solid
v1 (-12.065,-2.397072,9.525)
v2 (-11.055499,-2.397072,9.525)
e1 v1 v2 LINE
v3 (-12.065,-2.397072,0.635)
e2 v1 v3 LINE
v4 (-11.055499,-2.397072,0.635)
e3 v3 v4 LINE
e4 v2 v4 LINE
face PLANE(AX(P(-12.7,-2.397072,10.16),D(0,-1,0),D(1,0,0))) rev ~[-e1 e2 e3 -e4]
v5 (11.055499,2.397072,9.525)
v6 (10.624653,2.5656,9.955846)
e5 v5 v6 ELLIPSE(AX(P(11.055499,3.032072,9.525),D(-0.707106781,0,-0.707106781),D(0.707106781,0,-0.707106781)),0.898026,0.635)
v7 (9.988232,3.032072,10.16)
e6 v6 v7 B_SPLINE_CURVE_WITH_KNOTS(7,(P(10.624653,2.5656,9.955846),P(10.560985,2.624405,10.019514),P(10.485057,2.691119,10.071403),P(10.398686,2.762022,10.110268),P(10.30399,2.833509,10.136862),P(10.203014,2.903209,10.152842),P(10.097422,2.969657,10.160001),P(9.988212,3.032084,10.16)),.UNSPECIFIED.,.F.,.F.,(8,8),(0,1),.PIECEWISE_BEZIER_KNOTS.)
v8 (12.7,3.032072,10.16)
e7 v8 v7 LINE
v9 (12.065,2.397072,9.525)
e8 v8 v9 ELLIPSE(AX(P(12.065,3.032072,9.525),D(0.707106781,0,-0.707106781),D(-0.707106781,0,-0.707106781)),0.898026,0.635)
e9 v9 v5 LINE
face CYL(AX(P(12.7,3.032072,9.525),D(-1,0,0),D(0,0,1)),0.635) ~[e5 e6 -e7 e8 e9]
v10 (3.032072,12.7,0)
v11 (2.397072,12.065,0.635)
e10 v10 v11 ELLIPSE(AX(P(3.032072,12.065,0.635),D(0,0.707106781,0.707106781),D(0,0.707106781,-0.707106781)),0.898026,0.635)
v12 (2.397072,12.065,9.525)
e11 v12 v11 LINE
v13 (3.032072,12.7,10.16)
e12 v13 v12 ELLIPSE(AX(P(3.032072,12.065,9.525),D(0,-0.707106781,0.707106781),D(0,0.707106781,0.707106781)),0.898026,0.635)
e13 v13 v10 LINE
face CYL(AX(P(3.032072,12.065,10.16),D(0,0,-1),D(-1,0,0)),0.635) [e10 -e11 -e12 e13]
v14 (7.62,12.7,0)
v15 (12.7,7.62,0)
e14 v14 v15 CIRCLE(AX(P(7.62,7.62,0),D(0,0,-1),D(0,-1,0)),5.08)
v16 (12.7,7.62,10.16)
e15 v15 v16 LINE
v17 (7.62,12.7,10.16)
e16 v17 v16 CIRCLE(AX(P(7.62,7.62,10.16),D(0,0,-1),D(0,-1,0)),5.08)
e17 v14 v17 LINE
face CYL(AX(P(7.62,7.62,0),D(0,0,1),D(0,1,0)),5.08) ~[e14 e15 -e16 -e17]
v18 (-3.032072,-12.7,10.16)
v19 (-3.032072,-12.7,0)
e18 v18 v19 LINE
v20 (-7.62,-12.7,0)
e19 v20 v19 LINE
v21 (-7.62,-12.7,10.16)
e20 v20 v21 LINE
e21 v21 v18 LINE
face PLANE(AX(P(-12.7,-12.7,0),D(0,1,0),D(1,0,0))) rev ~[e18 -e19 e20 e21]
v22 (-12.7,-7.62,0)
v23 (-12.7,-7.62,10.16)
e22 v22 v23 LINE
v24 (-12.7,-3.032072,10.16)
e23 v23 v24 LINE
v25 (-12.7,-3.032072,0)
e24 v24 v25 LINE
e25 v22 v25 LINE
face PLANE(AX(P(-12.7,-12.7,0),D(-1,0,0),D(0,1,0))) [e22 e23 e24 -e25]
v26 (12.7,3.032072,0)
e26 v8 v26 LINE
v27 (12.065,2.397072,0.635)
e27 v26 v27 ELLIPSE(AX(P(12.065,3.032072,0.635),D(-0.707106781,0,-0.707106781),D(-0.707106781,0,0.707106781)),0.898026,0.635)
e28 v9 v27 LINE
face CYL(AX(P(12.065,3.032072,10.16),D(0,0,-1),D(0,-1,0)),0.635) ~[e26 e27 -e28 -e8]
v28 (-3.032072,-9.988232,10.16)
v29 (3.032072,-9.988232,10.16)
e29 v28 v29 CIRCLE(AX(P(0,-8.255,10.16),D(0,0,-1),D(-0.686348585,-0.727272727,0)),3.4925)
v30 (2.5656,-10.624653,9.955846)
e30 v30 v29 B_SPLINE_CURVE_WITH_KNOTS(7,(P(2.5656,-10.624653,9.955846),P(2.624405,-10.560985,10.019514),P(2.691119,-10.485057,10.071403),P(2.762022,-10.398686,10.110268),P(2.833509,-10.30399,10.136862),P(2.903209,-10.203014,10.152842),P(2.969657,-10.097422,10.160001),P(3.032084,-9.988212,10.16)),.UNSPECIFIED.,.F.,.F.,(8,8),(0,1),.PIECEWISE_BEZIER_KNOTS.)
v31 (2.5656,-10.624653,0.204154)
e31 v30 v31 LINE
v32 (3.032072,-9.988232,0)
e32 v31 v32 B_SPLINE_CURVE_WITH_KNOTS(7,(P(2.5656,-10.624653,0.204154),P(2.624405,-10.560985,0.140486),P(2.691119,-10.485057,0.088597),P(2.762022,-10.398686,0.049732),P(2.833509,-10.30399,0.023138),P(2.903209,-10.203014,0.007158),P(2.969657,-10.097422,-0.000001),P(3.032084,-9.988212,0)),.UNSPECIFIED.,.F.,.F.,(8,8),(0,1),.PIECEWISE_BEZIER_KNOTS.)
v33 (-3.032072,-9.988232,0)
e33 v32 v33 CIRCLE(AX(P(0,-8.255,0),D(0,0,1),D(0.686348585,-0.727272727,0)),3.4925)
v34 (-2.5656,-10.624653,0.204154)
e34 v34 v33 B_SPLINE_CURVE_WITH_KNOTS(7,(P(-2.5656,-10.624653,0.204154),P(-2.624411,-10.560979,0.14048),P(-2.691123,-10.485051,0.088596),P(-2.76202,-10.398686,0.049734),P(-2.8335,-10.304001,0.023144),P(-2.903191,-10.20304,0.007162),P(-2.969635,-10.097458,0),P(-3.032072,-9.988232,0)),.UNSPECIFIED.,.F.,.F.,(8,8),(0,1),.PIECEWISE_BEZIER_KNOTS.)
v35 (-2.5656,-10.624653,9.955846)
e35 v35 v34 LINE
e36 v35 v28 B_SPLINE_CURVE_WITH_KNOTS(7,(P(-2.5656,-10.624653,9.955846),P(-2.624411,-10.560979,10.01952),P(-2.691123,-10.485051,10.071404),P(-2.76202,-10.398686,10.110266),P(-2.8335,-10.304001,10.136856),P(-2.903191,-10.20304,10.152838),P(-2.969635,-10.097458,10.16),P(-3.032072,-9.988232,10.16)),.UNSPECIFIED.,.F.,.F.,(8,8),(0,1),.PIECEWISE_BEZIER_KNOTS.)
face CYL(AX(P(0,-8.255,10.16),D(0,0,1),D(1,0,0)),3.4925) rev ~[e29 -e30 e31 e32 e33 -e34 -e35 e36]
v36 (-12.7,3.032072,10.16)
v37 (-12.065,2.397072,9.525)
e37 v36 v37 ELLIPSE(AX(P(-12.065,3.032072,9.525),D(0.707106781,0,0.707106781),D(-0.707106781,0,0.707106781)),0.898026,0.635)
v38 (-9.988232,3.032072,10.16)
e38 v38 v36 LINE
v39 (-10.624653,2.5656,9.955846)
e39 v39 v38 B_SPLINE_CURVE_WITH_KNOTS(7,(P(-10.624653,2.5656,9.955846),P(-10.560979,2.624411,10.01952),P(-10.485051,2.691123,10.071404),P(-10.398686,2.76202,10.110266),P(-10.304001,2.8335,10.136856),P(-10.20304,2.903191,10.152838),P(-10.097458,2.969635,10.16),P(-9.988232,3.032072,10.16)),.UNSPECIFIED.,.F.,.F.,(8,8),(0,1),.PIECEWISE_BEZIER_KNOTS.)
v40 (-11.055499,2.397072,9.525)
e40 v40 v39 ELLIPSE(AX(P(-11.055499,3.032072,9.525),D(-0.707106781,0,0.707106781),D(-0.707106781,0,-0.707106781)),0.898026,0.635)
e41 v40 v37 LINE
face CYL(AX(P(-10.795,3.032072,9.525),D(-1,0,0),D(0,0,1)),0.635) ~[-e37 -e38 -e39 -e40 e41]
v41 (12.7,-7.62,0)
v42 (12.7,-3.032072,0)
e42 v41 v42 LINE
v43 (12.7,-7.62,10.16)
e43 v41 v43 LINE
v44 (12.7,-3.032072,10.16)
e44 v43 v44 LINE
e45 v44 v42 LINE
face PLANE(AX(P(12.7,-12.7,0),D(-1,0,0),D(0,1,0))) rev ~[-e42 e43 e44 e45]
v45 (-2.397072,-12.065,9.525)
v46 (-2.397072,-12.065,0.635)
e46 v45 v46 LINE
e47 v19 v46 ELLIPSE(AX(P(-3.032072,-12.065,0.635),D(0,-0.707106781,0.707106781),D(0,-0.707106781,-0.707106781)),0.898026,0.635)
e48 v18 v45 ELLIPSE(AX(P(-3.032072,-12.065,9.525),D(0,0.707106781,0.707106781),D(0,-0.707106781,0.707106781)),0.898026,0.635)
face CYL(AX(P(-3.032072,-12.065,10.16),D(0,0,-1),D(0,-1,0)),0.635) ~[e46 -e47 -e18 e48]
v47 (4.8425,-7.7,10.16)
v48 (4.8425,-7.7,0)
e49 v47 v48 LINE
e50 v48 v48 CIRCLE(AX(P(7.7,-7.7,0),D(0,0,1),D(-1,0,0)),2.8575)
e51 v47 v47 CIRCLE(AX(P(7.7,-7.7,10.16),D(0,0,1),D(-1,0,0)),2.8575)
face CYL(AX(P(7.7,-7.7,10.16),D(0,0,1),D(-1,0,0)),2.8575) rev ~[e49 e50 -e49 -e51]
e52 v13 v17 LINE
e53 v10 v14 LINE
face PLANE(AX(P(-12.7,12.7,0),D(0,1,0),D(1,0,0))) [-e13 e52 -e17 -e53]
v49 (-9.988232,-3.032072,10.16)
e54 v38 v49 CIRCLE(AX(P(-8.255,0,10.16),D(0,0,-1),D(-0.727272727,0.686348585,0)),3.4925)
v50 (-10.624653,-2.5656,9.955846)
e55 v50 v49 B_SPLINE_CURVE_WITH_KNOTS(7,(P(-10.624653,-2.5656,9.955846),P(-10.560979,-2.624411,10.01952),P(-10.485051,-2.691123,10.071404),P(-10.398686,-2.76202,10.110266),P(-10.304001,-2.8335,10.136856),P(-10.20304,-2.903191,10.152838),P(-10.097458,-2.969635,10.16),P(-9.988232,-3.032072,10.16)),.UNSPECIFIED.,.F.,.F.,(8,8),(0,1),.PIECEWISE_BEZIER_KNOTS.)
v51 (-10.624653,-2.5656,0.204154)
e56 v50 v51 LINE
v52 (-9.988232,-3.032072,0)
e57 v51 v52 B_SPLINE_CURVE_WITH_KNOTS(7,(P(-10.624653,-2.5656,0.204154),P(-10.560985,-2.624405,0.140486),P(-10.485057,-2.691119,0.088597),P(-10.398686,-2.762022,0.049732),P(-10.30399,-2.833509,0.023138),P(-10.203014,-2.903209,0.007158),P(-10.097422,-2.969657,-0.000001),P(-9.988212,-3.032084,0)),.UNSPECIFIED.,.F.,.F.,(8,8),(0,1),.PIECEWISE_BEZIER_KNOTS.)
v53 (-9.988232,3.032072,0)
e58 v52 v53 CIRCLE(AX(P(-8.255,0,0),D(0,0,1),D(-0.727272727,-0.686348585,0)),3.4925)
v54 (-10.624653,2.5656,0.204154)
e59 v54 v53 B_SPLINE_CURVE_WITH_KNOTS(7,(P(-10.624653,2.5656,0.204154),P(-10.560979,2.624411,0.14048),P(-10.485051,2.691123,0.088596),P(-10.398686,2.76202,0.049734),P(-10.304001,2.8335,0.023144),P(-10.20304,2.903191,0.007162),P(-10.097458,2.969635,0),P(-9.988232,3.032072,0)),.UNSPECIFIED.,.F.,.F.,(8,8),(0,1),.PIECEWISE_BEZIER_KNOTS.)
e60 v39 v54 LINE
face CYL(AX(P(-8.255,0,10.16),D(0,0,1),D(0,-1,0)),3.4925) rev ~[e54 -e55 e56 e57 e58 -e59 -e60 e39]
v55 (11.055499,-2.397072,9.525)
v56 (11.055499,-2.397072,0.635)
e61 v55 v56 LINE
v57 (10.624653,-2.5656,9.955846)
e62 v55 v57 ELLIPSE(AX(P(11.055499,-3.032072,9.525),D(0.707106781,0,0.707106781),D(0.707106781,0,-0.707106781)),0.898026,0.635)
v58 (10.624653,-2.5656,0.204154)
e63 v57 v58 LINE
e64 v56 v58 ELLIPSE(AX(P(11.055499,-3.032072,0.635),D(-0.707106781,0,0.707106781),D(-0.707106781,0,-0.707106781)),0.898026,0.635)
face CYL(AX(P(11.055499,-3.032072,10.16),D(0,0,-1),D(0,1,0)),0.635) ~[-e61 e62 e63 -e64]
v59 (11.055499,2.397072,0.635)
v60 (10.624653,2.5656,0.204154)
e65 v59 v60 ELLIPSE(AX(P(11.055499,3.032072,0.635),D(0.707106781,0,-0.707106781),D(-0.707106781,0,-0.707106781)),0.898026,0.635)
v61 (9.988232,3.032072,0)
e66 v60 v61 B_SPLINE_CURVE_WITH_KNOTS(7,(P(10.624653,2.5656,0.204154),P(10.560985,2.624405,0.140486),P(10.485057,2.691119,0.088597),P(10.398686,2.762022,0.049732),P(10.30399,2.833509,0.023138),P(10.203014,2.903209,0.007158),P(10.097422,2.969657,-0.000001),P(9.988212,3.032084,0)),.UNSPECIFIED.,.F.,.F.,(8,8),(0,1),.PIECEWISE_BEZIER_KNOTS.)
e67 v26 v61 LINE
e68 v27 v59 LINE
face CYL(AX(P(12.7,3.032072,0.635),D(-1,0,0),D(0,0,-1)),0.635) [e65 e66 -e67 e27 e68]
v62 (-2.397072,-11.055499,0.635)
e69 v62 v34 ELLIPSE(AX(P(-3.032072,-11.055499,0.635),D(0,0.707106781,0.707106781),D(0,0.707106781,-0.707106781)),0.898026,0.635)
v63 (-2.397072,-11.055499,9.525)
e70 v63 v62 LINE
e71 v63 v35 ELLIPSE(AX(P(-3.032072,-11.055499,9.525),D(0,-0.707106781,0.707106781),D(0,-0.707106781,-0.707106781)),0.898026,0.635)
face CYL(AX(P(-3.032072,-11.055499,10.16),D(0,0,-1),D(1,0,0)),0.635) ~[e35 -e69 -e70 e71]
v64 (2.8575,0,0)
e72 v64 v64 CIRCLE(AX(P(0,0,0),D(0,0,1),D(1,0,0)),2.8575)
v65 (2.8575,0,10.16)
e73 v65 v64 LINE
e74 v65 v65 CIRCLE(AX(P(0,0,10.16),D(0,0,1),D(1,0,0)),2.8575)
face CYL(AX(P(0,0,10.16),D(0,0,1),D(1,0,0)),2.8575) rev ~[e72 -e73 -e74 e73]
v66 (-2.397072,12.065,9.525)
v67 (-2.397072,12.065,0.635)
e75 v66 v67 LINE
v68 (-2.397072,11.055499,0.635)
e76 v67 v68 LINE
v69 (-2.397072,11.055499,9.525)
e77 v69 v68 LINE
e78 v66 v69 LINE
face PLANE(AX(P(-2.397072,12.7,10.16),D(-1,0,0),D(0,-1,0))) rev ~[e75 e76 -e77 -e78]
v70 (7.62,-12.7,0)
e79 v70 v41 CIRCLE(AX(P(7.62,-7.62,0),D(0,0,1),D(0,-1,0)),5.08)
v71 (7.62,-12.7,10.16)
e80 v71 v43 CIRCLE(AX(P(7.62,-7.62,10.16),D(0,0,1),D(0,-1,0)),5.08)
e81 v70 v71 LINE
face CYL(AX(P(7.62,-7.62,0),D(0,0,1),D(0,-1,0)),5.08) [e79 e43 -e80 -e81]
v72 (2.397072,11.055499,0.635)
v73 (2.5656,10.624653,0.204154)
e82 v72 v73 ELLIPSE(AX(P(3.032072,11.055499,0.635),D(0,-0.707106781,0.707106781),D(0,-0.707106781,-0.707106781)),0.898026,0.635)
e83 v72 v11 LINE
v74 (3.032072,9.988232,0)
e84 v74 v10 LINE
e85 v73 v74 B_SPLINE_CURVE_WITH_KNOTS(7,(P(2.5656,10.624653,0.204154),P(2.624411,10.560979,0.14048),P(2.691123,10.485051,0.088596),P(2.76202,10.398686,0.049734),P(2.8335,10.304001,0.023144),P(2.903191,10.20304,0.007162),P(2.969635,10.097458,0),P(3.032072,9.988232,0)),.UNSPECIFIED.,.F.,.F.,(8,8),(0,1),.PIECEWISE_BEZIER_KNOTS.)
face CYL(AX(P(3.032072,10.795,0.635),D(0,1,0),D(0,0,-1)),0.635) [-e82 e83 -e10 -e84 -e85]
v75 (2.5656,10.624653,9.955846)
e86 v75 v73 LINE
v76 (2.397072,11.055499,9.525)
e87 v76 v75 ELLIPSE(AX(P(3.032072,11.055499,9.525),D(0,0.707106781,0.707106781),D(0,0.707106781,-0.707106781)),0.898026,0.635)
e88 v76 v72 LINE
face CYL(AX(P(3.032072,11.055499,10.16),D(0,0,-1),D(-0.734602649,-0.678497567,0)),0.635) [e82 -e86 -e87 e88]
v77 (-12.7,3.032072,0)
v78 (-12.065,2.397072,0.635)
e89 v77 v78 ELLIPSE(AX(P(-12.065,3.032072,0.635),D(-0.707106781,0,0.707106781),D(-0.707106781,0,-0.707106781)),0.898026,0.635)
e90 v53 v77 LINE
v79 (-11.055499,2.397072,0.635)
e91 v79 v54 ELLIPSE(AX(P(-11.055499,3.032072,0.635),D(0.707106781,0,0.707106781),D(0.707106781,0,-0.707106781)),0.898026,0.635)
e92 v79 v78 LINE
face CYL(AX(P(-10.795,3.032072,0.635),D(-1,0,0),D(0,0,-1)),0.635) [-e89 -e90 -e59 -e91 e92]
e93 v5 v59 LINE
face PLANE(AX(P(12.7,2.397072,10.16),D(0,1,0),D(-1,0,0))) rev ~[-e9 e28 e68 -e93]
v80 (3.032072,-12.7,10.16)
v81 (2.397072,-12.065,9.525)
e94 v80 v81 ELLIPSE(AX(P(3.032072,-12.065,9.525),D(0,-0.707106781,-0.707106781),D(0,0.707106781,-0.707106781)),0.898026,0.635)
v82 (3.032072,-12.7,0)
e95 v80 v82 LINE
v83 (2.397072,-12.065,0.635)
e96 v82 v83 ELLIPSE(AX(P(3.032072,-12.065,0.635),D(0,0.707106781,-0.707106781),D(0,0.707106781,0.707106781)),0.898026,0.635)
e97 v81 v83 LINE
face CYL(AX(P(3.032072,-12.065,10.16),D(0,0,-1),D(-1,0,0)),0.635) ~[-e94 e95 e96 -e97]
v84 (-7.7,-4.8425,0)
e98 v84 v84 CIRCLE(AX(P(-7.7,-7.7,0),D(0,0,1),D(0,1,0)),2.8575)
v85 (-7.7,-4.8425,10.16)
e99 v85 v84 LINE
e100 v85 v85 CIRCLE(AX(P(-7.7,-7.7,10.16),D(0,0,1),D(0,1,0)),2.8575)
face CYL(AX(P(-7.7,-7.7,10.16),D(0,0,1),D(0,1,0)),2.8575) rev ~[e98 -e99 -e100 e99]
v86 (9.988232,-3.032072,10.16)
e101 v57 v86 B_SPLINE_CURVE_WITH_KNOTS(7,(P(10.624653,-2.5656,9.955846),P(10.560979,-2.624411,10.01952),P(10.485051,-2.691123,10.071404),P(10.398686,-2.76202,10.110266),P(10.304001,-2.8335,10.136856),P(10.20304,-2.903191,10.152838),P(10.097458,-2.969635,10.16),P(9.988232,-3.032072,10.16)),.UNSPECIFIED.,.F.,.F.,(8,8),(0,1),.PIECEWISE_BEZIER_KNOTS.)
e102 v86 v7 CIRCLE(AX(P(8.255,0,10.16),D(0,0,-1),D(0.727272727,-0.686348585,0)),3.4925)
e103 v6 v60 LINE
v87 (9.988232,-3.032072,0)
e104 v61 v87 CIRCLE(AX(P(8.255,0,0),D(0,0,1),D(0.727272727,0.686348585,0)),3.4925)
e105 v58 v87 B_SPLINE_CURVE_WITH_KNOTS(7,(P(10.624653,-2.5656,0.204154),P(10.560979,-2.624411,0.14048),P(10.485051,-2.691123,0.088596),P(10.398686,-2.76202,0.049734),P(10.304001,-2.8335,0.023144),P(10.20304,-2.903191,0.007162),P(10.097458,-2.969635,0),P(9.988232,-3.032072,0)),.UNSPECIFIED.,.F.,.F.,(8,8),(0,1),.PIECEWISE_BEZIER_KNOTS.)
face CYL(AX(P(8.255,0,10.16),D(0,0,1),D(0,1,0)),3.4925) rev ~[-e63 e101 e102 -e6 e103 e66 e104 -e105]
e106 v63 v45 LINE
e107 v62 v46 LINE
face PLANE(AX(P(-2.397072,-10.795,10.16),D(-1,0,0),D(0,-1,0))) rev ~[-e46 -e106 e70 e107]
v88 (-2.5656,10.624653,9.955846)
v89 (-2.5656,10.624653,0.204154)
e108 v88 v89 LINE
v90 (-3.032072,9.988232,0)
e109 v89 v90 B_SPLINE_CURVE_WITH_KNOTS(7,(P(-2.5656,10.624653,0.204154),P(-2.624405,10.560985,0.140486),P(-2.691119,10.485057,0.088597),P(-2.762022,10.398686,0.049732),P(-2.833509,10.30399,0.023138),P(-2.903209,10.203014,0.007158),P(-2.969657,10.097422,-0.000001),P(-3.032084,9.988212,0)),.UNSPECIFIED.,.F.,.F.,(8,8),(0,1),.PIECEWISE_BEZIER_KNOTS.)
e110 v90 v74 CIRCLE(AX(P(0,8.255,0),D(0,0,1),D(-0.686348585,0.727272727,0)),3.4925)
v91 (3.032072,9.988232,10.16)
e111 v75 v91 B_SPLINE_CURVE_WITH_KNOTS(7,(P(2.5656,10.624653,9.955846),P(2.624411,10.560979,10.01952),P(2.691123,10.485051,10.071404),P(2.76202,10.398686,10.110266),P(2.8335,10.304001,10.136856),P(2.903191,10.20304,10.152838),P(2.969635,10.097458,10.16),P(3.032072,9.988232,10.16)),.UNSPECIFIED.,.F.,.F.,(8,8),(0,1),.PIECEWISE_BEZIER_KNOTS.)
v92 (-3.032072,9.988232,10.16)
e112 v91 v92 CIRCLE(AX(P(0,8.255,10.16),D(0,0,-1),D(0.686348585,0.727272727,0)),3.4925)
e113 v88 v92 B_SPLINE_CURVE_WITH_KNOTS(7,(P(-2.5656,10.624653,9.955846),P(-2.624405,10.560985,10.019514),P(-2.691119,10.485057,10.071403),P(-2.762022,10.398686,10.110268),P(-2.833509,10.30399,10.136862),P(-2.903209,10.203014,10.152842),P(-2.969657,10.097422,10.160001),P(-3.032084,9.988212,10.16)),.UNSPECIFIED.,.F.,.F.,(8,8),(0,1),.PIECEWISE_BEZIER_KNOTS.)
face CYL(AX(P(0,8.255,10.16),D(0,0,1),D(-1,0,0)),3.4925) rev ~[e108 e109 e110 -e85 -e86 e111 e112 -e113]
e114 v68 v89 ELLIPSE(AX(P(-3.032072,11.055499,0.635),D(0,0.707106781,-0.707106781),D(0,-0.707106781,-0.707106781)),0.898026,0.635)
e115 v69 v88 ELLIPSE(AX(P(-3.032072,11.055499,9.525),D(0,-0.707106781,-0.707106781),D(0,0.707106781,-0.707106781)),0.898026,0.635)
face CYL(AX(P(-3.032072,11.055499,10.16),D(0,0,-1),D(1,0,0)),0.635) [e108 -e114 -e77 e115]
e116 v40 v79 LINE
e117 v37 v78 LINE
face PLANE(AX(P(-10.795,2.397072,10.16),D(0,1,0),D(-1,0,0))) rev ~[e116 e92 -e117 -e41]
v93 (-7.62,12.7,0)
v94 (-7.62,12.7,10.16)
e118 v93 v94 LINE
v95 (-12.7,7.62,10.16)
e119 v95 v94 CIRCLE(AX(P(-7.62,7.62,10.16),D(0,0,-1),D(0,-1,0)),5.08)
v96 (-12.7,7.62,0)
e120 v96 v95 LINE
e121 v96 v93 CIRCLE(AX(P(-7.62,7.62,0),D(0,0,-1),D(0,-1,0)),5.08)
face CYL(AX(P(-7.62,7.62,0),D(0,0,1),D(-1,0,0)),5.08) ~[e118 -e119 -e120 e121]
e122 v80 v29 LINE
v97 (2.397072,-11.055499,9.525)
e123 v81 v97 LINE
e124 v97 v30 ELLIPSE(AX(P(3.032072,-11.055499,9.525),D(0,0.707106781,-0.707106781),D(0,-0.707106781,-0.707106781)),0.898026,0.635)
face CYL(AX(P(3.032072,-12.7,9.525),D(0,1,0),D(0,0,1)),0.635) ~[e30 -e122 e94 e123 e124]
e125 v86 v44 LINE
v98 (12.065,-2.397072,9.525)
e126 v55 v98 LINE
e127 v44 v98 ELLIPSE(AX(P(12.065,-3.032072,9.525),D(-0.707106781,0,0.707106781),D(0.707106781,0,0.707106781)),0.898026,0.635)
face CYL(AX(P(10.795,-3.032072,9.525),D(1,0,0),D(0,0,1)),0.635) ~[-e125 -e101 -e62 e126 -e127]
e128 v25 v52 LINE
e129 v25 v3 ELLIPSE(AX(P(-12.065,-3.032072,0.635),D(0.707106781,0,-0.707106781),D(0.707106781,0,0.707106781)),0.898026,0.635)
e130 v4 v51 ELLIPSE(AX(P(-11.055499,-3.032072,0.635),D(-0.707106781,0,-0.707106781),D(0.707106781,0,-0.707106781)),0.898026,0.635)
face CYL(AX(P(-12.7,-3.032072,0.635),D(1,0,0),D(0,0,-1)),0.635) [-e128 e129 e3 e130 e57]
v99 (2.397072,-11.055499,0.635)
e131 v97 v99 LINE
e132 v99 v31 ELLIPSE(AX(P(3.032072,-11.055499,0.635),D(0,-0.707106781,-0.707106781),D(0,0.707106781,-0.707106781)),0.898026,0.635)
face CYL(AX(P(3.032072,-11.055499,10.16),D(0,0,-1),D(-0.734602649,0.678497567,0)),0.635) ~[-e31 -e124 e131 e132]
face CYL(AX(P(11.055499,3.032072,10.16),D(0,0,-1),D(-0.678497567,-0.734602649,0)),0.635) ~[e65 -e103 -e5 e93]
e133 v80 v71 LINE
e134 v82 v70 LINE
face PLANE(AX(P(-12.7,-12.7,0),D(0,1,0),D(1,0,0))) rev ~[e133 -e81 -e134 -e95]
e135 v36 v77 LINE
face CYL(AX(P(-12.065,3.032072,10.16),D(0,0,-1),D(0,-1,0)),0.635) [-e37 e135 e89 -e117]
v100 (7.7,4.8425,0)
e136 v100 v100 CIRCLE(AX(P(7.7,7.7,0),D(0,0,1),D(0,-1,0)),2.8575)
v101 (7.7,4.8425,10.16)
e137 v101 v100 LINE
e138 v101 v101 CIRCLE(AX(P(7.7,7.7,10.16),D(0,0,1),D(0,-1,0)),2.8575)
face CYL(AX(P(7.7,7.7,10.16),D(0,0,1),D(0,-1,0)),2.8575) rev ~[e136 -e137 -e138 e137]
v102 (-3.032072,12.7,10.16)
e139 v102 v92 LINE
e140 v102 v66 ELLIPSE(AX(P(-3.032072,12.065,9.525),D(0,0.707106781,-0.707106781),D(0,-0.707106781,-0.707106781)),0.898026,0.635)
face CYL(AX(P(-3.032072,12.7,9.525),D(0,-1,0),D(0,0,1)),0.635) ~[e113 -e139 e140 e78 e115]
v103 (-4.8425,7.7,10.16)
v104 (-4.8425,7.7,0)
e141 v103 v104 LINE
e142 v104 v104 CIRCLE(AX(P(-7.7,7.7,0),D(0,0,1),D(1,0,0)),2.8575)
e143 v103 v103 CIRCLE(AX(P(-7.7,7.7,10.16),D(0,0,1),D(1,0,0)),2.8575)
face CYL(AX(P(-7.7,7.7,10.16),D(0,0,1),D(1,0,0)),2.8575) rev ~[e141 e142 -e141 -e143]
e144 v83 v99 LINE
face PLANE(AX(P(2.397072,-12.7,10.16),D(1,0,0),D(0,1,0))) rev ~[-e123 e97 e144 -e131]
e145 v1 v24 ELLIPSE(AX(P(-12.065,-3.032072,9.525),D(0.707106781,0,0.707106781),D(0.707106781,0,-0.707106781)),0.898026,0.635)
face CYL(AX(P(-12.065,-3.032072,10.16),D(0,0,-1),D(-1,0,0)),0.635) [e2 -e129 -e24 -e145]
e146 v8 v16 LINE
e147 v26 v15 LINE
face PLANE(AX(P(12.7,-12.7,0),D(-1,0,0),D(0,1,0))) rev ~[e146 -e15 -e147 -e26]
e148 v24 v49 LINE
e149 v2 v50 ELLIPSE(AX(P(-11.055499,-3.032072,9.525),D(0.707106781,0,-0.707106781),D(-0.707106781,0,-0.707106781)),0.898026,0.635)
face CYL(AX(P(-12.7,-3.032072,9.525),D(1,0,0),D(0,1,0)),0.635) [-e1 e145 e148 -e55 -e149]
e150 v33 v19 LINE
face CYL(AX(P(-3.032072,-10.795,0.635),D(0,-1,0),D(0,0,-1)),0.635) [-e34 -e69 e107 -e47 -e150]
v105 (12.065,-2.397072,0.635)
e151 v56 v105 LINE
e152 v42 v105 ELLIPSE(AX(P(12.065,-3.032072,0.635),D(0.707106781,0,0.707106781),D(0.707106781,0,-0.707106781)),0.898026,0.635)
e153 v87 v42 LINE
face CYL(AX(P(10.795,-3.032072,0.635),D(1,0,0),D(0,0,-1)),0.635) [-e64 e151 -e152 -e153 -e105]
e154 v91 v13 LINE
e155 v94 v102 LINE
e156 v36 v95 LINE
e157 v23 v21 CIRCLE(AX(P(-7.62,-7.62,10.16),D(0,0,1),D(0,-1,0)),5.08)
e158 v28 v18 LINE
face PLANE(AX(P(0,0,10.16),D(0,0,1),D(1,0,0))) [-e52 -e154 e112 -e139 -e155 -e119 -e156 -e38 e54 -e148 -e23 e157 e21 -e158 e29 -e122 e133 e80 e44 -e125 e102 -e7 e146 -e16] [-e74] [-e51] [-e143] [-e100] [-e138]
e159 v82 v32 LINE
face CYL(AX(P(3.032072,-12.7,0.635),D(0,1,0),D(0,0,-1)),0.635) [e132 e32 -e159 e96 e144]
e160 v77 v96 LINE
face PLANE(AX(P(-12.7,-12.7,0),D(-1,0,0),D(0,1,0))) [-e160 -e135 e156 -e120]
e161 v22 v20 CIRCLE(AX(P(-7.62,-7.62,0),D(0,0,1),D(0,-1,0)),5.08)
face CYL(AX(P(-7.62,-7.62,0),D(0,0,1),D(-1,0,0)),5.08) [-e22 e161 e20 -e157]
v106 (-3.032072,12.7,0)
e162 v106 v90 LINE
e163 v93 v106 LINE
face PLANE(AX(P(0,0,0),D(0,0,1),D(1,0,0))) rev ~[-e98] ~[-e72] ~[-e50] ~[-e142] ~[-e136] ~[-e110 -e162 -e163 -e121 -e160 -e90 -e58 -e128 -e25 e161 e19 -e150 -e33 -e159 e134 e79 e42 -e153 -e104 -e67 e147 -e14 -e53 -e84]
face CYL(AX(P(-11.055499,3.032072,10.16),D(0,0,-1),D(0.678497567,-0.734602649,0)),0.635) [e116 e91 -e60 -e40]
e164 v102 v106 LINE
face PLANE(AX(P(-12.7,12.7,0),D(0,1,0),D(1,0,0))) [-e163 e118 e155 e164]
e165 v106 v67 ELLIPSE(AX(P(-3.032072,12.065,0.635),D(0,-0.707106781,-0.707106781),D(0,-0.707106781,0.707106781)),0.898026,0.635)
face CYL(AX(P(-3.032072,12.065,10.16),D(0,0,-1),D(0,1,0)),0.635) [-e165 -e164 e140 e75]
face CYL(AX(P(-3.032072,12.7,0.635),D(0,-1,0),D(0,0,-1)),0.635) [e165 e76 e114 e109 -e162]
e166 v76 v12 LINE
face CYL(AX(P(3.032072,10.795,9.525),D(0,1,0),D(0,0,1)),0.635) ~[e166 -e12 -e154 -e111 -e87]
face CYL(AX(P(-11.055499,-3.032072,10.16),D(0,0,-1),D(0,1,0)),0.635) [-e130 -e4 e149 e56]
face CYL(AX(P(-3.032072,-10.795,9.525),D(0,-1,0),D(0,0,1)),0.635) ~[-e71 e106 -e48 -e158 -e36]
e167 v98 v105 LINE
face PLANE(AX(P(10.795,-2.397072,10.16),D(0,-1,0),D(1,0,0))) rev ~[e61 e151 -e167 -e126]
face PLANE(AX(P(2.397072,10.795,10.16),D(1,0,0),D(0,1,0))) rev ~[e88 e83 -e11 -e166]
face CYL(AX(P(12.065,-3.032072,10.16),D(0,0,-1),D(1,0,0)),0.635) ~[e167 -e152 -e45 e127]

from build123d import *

# Parameters (mm, degrees)
F0_W             = 25.4
F0_H             = 25.4
F1_DEPTH         = 10.16
F2_R             = 3.4925
F3_DEPTH         = 25.4
F3_COPIES_COUNT  = 4
F5_DEPTH         = 25.4
F5_COPIES_COUNT  = 4
F7_R             = 2.8575
F8_DEPTH         = 25.4
F9_R             = 2.8575
F10_DEPTH        = 25.4
F10_COPIES_COUNT = 4
F11_R            = 5.08
F12_R            = 0.635


# Not quite as in the source:
# - a pattern or mirror of a feature is missing from the dataset's text; its kind, count and spacing are read off the source's solid


with BuildPart() as f1:
    # F0 (on Top) → F1 (new body)
    with BuildSketch(Plane.XY):
        Rectangle(F0_W, F0_H)
    extrude(amount=F1_DEPTH)

    # F2 (on face) → F3 (cut)
    with BuildSketch(Plane.XY.offset(10.16)):
        with Locations((0, -8.255)):
            Circle(F2_R)
    f3 = extrude(amount=-F3_DEPTH, mode=Mode.SUBTRACT)

    # F3_copies: F3 ×4 about axis
    f3_copies_axis = Axis((0, 0, 0), (0, 0, 1))
    for i in range(1, F3_COPIES_COUNT):
        add(f3.rotate(f3_copies_axis, i * 360 / F3_COPIES_COUNT), mode=Mode.SUBTRACT)

    # F4 (on face) → F5 (cut)
    with BuildSketch(Plane.XY.offset(10.16)):
        with BuildLine():
            Line((-2.3970724332, -10.795), (-2.3970724332, -12.7))
            Line((-2.3970724332, -12.7), (2.3970724332, -12.7))
            Line((2.3970724332, -12.7), (2.3970724332, -10.795))
            ThreePointArc((2.3970724332, -10.795), (0, -11.7475), (-2.3970724332, -10.795))
        make_face()
    f5 = extrude(amount=-F5_DEPTH, mode=Mode.SUBTRACT)

    # F5_copies: F5 ×4 about axis
    f5_copies_axis = Axis((0, 0, 0), (0, 0, 1))
    for i in range(1, F5_COPIES_COUNT):
        add(f5.rotate(f5_copies_axis, i * 360 / F5_COPIES_COUNT), mode=Mode.SUBTRACT)

    # F7 (on face) → F8 (cut)
    with BuildSketch(Plane.XY.offset(10.16)):
        Circle(F7_R)
    extrude(amount=-F8_DEPTH, mode=Mode.SUBTRACT)

    # F9 (on face) → F10 (cut)
    with BuildSketch(Plane.XY.offset(10.16)):
        with Locations((-7.7, 7.7)):
            Circle(F9_R)
    f10 = extrude(amount=-F10_DEPTH, mode=Mode.SUBTRACT)

    # F10_copies: F10 ×4 about axis
    f10_copies_axis = Axis((0, 0, 0), (0, 0, 1))
    for i in range(1, F10_COPIES_COUNT):
        add(f10.rotate(f10_copies_axis, i * 360 / F10_COPIES_COUNT), mode=Mode.SUBTRACT)

    # F11
    f11_edges = [f1.edges().sort_by_distance(p)[0] for p in [
        (-12.7, 12.7, 5.08),
        (-12.7, -12.7, 5.08),
        (12.7, -12.7, 5.08),
        (12.7, 12.7, 5.08),
    ]]
    fillet(f11_edges, radius=F11_R)

    # F12
    f12_edges = [f1.edges().sort_by_distance(p)[0] for p in [
        (2.397072, -11.7475, 10.16),
        (2.397072, -10.795, 5.08),
        (2.397072, -11.7475, 0),
        (2.397072, -12.7, 5.08),
        (-2.397072, -11.7475, 10.16),
        (-2.397072, -12.7, 5.08),
        (-2.397072, -11.7475, 0),
        (-2.397072, -10.795, 5.08),
        (11.7475, 2.397072, 0),
        (2.397072, 11.7475, 0),
        (11.7475, -2.397072, 0),
        (-2.397072, 11.7475, 0),
        (-11.7475, 2.397072, 0),
        (-11.7475, -2.397072, 0),
        (11.7475, 2.397072, 10.16),
        (2.397072, 11.7475, 10.16),
        (11.7475, -2.397072, 10.16),
        (-2.397072, 11.7475, 10.16),
        (-11.7475, 2.397072, 10.16),
        (-11.7475, -2.397072, 10.16),
        (12.7, 2.397072, 5.08),
        (10.795, 2.397072, 5.08),
        (2.397072, 12.7, 5.08),
        (10.795, -2.397072, 5.08),
        (2.397072, 10.795, 5.08),
        (12.7, -2.397072, 5.08),
        (-2.397072, 10.795, 5.08),
        (-2.397072, 12.7, 5.08),
        (-12.7, 2.397072, 5.08),
        (-10.795, 2.397072, 5.08),
        (-10.795, -2.397072, 5.08),
        (-12.7, -2.397072, 5.08),
    ]]
    fillet(f12_edges, radius=F12_R)


solid = f1.part
